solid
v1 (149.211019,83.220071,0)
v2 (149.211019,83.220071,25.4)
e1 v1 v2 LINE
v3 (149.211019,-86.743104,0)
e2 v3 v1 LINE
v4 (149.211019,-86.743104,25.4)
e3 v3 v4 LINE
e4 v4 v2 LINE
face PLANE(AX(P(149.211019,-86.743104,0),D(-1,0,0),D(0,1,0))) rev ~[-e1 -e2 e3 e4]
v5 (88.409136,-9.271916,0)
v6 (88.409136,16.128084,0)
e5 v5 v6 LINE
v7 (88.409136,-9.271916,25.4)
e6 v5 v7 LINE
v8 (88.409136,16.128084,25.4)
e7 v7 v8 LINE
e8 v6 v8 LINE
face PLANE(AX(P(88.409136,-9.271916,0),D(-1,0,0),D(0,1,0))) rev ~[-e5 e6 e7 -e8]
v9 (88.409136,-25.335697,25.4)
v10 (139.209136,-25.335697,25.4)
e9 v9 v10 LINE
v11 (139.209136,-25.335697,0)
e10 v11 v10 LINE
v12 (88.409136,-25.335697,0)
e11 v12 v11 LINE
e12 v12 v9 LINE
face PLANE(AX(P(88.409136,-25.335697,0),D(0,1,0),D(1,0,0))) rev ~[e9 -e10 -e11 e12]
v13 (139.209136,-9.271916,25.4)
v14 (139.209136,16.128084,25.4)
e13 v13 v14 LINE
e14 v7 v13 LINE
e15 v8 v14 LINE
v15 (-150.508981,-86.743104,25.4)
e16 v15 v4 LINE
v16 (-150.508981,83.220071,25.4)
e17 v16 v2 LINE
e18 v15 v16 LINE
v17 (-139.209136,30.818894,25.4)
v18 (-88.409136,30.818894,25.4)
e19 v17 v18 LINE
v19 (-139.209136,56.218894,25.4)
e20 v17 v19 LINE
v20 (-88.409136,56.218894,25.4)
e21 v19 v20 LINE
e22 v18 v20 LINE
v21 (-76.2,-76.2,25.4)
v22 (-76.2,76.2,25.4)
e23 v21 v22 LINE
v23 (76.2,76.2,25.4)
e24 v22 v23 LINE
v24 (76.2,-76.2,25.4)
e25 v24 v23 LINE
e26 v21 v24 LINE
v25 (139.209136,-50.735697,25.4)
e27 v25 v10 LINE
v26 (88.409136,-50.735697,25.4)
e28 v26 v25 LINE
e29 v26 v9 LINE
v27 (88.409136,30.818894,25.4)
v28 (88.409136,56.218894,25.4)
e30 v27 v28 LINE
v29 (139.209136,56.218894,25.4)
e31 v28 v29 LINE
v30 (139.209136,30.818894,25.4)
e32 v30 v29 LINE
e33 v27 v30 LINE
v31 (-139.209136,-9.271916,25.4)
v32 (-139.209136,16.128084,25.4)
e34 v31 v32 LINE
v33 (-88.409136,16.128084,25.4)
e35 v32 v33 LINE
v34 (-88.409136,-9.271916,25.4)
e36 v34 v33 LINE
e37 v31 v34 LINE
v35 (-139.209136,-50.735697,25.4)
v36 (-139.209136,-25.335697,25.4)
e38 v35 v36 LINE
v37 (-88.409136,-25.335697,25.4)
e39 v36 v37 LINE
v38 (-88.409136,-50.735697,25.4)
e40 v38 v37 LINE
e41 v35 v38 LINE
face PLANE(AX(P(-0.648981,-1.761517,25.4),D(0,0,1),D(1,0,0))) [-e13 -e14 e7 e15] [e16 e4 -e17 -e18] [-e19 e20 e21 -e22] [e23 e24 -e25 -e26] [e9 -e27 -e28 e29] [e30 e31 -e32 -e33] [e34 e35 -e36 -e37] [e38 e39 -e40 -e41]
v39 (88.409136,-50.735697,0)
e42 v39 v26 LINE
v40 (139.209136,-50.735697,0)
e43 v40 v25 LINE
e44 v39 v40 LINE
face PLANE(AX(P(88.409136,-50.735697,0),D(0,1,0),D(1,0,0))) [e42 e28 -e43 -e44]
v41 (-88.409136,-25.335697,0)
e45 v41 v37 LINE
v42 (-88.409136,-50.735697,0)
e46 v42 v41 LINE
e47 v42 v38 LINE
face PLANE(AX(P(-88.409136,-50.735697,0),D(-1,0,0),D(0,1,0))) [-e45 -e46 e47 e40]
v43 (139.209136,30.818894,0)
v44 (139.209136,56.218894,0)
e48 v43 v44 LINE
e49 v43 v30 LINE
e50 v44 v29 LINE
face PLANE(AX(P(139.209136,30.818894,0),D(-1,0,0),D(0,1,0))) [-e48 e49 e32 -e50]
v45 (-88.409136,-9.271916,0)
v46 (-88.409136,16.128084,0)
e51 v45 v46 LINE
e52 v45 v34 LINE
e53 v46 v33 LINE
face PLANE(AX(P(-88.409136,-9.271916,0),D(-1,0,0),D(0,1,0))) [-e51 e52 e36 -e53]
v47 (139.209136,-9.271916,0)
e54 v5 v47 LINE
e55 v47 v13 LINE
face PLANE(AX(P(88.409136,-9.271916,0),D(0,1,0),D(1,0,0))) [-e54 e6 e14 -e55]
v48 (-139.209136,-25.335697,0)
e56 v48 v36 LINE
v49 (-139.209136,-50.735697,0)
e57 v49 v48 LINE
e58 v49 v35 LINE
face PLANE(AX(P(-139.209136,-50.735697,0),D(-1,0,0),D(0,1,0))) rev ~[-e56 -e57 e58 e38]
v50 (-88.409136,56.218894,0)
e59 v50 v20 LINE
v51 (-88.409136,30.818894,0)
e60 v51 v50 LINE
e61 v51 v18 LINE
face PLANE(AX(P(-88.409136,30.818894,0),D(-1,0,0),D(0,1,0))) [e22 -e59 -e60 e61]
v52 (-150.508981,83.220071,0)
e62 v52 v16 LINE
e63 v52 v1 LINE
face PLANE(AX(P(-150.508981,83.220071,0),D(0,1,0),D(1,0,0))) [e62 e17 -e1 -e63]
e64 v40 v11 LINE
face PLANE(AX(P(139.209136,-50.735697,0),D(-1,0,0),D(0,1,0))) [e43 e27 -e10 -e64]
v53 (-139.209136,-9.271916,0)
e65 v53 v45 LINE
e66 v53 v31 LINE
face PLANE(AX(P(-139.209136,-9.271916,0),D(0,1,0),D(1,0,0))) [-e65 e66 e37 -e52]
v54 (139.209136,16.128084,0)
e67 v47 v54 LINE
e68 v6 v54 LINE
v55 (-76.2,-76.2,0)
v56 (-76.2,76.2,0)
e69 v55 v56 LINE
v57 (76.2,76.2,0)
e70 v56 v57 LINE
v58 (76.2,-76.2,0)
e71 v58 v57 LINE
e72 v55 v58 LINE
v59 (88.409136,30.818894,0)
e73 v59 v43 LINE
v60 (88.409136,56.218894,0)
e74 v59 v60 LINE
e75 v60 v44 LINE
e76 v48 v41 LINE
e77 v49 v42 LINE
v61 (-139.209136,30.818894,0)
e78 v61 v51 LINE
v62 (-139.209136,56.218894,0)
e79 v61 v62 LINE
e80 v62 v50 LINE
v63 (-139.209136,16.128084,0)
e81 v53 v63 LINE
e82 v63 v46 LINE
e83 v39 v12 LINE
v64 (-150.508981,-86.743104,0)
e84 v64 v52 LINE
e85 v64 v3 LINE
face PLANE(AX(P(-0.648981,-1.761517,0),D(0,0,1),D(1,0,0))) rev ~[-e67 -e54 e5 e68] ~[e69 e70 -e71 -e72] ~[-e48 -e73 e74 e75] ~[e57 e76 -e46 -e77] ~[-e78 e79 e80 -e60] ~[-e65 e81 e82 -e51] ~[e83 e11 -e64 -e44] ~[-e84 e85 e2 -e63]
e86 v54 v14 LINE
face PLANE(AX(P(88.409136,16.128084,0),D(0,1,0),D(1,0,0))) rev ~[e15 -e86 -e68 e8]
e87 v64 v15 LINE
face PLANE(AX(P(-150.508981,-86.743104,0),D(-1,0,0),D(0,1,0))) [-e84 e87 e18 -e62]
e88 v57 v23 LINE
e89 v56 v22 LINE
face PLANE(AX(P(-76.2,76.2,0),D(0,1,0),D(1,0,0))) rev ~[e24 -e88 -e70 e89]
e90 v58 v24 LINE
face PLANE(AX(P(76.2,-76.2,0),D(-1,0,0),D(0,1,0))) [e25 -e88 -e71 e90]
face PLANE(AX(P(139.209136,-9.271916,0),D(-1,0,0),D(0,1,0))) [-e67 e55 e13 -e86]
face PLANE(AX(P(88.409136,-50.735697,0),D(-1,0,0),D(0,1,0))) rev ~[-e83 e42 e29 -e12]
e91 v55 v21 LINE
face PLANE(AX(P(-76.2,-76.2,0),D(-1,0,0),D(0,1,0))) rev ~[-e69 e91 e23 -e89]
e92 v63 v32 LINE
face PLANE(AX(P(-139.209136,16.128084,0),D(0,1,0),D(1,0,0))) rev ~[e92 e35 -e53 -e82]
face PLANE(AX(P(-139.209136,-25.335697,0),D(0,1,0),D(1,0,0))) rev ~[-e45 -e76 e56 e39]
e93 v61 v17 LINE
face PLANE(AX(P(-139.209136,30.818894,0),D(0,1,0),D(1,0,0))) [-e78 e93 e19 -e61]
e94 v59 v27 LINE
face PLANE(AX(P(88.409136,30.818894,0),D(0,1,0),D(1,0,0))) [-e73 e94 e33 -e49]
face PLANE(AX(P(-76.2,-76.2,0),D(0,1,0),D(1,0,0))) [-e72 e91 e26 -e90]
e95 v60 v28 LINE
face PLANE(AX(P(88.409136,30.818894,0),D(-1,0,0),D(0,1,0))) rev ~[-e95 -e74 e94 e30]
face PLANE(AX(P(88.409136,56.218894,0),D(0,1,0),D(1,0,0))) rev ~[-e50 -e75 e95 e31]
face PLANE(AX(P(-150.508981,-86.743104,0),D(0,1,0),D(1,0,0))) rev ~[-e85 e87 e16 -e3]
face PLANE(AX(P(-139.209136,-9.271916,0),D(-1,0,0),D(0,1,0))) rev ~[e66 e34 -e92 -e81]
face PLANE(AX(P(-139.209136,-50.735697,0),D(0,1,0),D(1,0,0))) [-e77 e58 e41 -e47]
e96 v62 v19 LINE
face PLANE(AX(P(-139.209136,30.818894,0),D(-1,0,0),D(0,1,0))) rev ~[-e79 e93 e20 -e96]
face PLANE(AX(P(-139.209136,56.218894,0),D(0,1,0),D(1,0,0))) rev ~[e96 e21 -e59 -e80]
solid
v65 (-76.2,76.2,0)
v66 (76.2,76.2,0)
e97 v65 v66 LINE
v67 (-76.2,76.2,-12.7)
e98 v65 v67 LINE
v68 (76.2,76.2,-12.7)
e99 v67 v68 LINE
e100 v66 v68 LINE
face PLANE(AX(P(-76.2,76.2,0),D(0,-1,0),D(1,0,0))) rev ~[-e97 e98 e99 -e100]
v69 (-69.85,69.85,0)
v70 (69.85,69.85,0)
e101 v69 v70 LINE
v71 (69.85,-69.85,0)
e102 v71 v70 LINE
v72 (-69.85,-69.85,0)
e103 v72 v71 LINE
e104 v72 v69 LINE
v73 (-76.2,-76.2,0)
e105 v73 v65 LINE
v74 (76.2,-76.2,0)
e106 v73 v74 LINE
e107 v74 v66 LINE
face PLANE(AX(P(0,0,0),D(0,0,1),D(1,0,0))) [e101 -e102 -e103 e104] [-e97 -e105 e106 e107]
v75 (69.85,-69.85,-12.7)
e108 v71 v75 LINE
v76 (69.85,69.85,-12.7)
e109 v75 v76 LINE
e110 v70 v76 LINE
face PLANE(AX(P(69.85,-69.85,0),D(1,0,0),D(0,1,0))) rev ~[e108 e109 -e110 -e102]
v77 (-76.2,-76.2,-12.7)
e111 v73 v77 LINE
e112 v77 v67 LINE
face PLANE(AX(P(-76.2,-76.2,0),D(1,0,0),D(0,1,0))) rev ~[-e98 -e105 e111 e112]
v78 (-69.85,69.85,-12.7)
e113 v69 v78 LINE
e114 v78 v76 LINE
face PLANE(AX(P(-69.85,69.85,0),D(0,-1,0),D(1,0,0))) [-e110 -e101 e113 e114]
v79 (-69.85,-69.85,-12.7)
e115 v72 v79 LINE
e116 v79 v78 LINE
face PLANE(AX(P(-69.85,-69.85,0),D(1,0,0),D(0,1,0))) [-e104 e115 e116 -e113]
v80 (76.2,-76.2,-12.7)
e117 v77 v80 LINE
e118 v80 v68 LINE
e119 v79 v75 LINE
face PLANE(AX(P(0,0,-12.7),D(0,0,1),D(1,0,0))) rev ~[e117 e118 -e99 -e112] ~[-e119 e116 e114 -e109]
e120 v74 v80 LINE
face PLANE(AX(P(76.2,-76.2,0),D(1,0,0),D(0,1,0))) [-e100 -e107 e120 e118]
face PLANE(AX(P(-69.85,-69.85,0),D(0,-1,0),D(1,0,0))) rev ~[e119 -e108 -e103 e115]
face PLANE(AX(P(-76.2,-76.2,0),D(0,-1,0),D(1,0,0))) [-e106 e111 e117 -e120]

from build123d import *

# Parameters (mm, degrees)
F0_W     = 299.72
F0_H     = 169.9631744818
F3_DEPTH = 25.4
F1_W     = 50.8
F1_H     = 25.4
F4_DEPTH = 25.4
F2_W     = 152.4
F2_H     = 152.4
F2_W_2   = 139.7
F2_H_2   = 139.7
F5_DEPTH = 25.4
F6_DEPTH = 12.7


# Not quite as in the source:
# - a feature of the source that left no trace in its solid (it failed there, or was rolled back) is left out


with BuildPart() as f3:
    # F0 (on Top) → F3 (new body)
    with BuildSketch(Plane.XY):
        with Locations((-0.6489809602, -1.7615165561)):
            Rectangle(F0_W, F0_H)
    extrude(amount=F3_DEPTH)

    # F1 (on face) → F4 (cut)
    with BuildSketch(Plane.XY):
        with Locations((113.8091359086, 43.5188937416)):
            Rectangle(F1_W, F1_H)
        with Locations((113.8091359086, 3.428083711)):
            Rectangle(F1_W, F1_H)
        with Locations((113.8091359086, -38.0356973421)):
            Rectangle(F1_W, F1_H)
        with Locations((-113.8091359086, 43.5188937416)):
            Rectangle(F1_W, F1_H)
        with Locations((-113.8091359086, 3.428083711)):
            Rectangle(F1_W, F1_H)
        with Locations((-113.8091359086, -38.0356973421)):
            Rectangle(F1_W, F1_H)
    extrude(amount=F4_DEPTH, mode=Mode.SUBTRACT)

    # F2 (on Top) → F5 (cut)
    with BuildSketch(Plane.XY):
        Rectangle(F2_W, F2_H)
        Rectangle(F2_W_2, F2_H_2, mode=Mode.SUBTRACT)
        Rectangle(F2_W_2, F2_H_2)
    extrude(amount=F5_DEPTH, mode=Mode.SUBTRACT)


with BuildPart() as f6:
    # F2 (on Top) → F6 (new body)
    with BuildSketch(Plane.XY):
        Rectangle(F2_W, F2_H)
        Rectangle(F2_W_2, F2_H_2, mode=Mode.SUBTRACT)
    extrude(amount=-F6_DEPTH)


solid = Compound([f3.part, f6.part])
